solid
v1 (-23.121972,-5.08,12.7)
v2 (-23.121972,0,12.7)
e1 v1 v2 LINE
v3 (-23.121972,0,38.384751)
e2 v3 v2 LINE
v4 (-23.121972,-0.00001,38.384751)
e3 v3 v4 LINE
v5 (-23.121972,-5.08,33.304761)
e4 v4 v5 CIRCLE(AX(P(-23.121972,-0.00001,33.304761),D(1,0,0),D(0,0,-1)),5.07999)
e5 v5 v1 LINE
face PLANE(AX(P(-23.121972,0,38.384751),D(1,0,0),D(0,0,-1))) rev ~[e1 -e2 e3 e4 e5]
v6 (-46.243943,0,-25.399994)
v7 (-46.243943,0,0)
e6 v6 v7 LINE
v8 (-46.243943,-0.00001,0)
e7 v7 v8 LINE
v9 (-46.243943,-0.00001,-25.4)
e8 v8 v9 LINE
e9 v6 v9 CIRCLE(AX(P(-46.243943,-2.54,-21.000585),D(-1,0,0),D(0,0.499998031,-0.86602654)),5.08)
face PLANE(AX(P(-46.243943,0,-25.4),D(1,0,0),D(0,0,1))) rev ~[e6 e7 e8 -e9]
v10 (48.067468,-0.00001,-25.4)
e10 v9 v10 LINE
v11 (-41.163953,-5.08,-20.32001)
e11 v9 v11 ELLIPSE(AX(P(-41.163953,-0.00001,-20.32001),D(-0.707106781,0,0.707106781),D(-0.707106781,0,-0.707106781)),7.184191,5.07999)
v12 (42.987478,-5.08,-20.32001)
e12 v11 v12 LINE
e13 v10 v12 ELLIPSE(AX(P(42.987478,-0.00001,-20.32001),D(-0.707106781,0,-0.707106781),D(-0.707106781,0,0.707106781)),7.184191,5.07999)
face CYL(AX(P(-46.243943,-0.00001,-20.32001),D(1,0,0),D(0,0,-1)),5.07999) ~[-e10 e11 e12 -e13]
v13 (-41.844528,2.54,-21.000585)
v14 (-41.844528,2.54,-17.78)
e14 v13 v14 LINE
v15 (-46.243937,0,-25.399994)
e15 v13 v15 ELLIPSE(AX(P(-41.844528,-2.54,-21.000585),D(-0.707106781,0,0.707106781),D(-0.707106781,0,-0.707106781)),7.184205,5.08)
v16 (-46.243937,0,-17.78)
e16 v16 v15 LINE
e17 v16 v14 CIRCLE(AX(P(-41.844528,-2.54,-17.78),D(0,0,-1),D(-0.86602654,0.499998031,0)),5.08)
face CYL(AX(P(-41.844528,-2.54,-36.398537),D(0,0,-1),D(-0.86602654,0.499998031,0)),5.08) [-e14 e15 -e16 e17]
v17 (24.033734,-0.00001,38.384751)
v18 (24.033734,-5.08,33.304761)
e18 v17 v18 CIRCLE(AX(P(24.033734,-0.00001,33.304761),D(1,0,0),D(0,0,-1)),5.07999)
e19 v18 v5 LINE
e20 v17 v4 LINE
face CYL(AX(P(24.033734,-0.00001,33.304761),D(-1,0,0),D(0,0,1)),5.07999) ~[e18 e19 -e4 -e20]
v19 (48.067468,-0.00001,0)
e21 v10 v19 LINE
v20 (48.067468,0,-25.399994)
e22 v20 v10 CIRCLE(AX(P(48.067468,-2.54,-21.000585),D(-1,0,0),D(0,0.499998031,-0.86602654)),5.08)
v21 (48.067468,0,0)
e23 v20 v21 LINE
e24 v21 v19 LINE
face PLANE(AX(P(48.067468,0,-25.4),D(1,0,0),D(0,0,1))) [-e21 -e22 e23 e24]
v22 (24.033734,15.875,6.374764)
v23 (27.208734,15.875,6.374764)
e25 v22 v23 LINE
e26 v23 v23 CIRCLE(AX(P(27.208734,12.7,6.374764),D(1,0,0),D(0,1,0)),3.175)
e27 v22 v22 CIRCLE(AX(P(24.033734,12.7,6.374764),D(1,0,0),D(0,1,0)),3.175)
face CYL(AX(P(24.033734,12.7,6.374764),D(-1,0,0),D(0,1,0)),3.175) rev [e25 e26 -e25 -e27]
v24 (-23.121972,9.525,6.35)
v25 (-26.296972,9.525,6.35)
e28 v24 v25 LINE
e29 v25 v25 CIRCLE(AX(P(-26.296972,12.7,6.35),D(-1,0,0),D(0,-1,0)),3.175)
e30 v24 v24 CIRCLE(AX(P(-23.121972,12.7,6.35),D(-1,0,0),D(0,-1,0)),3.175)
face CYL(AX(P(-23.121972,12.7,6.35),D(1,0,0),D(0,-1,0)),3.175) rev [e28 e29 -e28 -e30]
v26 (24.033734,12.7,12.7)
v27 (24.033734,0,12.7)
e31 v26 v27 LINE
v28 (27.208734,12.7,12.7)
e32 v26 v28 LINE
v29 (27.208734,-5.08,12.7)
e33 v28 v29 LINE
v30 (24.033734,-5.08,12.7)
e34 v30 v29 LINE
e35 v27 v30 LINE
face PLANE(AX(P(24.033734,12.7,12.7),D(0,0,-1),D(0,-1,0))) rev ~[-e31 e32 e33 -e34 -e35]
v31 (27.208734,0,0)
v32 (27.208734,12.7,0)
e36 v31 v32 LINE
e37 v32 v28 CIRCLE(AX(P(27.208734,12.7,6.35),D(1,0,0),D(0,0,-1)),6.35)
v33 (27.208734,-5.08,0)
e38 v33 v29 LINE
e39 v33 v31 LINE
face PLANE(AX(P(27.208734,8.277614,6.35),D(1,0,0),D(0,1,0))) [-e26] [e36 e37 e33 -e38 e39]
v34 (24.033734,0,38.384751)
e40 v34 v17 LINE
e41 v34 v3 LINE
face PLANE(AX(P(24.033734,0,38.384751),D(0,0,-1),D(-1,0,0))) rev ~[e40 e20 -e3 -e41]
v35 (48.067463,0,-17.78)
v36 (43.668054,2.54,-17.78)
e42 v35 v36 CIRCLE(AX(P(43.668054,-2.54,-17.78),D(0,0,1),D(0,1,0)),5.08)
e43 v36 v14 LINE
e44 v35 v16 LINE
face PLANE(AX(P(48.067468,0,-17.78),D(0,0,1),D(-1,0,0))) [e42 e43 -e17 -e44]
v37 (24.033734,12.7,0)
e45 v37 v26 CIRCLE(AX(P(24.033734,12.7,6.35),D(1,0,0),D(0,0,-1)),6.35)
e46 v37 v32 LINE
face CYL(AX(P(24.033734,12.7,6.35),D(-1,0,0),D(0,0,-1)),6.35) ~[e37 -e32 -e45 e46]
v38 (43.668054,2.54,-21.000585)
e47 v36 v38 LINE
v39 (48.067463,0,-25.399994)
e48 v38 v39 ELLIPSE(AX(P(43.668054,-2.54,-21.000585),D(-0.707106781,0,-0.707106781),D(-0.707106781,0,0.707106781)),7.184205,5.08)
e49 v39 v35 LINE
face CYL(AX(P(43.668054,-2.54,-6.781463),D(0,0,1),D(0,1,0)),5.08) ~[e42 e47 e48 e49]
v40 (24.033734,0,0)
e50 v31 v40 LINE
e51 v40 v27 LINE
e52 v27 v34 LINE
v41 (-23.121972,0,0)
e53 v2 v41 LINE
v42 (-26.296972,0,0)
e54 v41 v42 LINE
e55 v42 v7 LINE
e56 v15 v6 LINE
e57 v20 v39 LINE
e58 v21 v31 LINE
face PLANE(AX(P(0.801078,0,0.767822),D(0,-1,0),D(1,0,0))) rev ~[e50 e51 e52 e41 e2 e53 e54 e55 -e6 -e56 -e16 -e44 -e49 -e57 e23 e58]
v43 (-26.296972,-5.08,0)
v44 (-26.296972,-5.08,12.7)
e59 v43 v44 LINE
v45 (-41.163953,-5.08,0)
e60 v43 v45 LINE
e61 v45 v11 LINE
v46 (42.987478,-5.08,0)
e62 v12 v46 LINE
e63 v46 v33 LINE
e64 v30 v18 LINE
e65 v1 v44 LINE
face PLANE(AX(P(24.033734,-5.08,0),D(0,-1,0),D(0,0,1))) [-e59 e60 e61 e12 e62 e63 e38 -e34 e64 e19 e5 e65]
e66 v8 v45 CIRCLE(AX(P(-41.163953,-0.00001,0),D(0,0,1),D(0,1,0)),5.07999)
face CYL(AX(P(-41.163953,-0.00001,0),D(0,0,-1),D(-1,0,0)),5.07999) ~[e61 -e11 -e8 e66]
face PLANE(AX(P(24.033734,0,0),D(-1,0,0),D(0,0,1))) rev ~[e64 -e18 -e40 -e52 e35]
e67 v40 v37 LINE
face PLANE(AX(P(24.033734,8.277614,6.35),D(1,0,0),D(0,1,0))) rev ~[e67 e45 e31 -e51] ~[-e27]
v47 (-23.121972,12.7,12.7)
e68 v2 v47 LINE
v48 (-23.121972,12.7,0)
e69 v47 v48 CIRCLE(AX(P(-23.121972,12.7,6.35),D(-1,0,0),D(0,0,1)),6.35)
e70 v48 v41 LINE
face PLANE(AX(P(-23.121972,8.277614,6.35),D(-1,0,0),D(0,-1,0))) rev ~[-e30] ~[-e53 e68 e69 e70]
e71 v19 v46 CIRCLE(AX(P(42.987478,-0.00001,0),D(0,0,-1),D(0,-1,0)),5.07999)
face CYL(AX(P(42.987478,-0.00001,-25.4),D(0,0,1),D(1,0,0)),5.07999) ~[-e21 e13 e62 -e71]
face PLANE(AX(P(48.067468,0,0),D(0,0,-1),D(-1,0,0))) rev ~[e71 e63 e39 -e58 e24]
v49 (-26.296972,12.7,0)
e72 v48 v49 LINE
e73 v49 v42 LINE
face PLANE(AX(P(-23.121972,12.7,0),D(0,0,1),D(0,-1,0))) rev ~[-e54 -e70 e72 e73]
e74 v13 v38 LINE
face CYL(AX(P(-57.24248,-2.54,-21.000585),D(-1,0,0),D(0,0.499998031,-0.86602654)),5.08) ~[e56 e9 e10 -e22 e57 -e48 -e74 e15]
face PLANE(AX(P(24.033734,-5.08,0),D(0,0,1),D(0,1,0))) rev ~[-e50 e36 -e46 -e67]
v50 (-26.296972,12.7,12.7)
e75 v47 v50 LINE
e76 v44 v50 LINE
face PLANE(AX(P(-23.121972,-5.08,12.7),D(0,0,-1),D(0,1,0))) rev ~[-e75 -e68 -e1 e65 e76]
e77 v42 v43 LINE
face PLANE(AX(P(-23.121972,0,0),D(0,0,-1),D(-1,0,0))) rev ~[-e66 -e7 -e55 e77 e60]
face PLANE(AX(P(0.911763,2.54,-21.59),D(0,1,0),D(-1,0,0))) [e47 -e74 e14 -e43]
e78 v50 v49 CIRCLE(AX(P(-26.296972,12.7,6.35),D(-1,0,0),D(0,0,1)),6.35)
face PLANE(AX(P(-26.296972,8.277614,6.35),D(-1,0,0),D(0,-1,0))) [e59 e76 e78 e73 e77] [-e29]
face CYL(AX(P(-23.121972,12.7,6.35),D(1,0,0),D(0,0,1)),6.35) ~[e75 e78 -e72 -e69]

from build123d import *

# Parameters (mm, degrees)
F1_DEPTH     = 5.08
F2_R         = 5.07999
F3_R         = 3.175
F3_W         = 5.08
F3_H         = 12.7
F4_DEPTH     = 3.175
F5_R         = 3.175
F5_W         = 5.08
F5_H         = 12.7
F6_DEPTH     = 3.175
F7_W         = 94.3114114086
F7_H         = 7.62
F8_DEPTH     = 2.54
F9_T1_DEPTH  = 116.3084855321
F9_T6_DEPTH  = 29.6170741236
F9_T11_DEPTH = 29.6170741236


# Not quite as in the source:
# - a fillet or chamfer that OpenCascade refuses, or shapes differently, is made with other operations: its cross-section is extruded or revolved along the edge and cut away or added
# - a fillet or chamfer is up to 0.001 mm smaller than in the source, because OpenCascade refuses the exact size


with BuildPart() as f1:
    # F0 (on Front) → F1 (new body)
    with BuildSketch(Plane.XZ):
        Polygon((-23.1219715205, 38.3847513186), (-23.1219715205, 0), (-46.243943041, 0), (-46.243943041, -25.4), (48.0674683675, -25.4), (48.0674683675, 0), (24.0337341838, 0), (24.0337341838, 38.3847513186), align=None)
    extrude(amount=F1_DEPTH)

    # F2 (radius 5.08 in the source; OpenCascade refuses exactly that, so slightly less here)
    f2_edges = [f1.edges().sort_by_distance(p)[0] for p in [
        (-46.243943, -5.08, -12.7),
        (48.067468, -5.08, -12.7),
        (0.911763, -5.08, -25.4),
        (0.455881, -5.08, 38.384751),
    ]]
    fillet(f2_edges, radius=F2_R)

    # F3 (on face) → F4 (join)
    with BuildSketch(Plane(origin=(-23.1219715205, 0, 0), x_dir=(0, -1, 0), z_dir=(-1, 0, 0))):
        with BuildLine():
            Line((-12.7, 0), (0, 0))
            Line((0, 0), (0, 12.7))
            Line((0, 12.7), (-12.7, 12.7))
            ThreePointArc((-12.7, 12.7), (-19.05, 6.35), (-12.7, 0))
        make_face()
        with Locations((-12.7, 6.35)):
            Circle(F3_R, mode=Mode.SUBTRACT)
        with Locations((2.54, 6.35)):
            Rectangle(F3_W, F3_H)
    extrude(amount=F4_DEPTH)

    # F5 (on face) → F6 (join)
    with BuildSketch(Plane.YZ.offset(24.0337341838)):
        with BuildLine():
            Line((0, 12.7), (0, 0))
            Line((0, 0), (12.7, 0))
            ThreePointArc((12.7, 0), (19.05, 6.35), (12.7, 12.7))
            Line((12.7, 12.7), (0, 12.7))
        make_face()
        with Locations((12.7, 6.3747640323)):
            Circle(F5_R, mode=Mode.SUBTRACT)
        with Locations((-2.54, 6.35)):
            Rectangle(F5_W, F5_H)
    extrude(amount=F6_DEPTH)

    # F7 (on face) → F8 (join)
    with BuildSketch(Plane(origin=(0, 0, 0), x_dir=(-1, 0, 0), z_dir=(0, 1, 0))):
        with Locations((-0.9117626632, -21.59)):
            Rectangle(F7_W, F7_H)
    extrude(amount=F8_DEPTH)

    # F9: fillet of radius 5.08 on 3 edges, made by hand

    # F9_s2 → F9_t1 (cut)
    with BuildSketch(Plane.YZ.offset(-57.2424801028)):
        with BuildLine():
            ThreePointArc((-1e-05, -25.4), (1.8594061645, -23.5405901753), (2.54, -21.0005851753))
            Line((2.54, -21.0005851753), (2.54, -25.4))
            Line((2.54, -25.4), (-1e-05, -25.4))
        make_face()
    extrude(amount=F9_T1_DEPTH, mode=Mode.SUBTRACT)


with BuildPart() as f9_tool4:
    # F9_s5 → F9_t6 (new body)
    with BuildSketch(Plane.XY.offset(-36.3985370618)):
        with BuildLine():
            ThreePointArc((-46.243943041, -1e-05), (-44.3845332163, 1.8594061645), (-41.8445282163, 2.54))
            Line((-41.8445282163, 2.54), (-46.243943041, 2.54))
            Line((-46.243943041, 2.54), (-46.243943041, -1e-05))
        make_face()
    extrude(amount=F9_T6_DEPTH)

    split(bisect_by=Plane.XZ, keep=Keep.BOTTOM)


with BuildPart() as f1_1:
    add(f1.part)

    # F9_t3: cut F9_tool4
    add(f9_tool4.part, mode=Mode.SUBTRACT)


with BuildPart() as f9_tool9:
    # F9_s10 → F9_t11 (new body)
    with BuildSketch(Plane.XY.offset(-6.7814629382)):
        with BuildLine():
            ThreePointArc((43.6680535428, 2.54), (46.2080585428, 1.8594061645), (48.0674683675, -1e-05))
            Line((48.0674683675, -1e-05), (48.0674683675, 2.54))
            Line((48.0674683675, 2.54), (43.6680535428, 2.54))
        make_face()
    extrude(amount=-F9_T11_DEPTH)

    split(bisect_by=Plane.XZ, keep=Keep.BOTTOM)


with BuildPart() as f1_2:
    add(f1_1.part)

    # F9_t8: cut F9_tool9
    add(f9_tool9.part, mode=Mode.SUBTRACT)


solid = f1_2.part
